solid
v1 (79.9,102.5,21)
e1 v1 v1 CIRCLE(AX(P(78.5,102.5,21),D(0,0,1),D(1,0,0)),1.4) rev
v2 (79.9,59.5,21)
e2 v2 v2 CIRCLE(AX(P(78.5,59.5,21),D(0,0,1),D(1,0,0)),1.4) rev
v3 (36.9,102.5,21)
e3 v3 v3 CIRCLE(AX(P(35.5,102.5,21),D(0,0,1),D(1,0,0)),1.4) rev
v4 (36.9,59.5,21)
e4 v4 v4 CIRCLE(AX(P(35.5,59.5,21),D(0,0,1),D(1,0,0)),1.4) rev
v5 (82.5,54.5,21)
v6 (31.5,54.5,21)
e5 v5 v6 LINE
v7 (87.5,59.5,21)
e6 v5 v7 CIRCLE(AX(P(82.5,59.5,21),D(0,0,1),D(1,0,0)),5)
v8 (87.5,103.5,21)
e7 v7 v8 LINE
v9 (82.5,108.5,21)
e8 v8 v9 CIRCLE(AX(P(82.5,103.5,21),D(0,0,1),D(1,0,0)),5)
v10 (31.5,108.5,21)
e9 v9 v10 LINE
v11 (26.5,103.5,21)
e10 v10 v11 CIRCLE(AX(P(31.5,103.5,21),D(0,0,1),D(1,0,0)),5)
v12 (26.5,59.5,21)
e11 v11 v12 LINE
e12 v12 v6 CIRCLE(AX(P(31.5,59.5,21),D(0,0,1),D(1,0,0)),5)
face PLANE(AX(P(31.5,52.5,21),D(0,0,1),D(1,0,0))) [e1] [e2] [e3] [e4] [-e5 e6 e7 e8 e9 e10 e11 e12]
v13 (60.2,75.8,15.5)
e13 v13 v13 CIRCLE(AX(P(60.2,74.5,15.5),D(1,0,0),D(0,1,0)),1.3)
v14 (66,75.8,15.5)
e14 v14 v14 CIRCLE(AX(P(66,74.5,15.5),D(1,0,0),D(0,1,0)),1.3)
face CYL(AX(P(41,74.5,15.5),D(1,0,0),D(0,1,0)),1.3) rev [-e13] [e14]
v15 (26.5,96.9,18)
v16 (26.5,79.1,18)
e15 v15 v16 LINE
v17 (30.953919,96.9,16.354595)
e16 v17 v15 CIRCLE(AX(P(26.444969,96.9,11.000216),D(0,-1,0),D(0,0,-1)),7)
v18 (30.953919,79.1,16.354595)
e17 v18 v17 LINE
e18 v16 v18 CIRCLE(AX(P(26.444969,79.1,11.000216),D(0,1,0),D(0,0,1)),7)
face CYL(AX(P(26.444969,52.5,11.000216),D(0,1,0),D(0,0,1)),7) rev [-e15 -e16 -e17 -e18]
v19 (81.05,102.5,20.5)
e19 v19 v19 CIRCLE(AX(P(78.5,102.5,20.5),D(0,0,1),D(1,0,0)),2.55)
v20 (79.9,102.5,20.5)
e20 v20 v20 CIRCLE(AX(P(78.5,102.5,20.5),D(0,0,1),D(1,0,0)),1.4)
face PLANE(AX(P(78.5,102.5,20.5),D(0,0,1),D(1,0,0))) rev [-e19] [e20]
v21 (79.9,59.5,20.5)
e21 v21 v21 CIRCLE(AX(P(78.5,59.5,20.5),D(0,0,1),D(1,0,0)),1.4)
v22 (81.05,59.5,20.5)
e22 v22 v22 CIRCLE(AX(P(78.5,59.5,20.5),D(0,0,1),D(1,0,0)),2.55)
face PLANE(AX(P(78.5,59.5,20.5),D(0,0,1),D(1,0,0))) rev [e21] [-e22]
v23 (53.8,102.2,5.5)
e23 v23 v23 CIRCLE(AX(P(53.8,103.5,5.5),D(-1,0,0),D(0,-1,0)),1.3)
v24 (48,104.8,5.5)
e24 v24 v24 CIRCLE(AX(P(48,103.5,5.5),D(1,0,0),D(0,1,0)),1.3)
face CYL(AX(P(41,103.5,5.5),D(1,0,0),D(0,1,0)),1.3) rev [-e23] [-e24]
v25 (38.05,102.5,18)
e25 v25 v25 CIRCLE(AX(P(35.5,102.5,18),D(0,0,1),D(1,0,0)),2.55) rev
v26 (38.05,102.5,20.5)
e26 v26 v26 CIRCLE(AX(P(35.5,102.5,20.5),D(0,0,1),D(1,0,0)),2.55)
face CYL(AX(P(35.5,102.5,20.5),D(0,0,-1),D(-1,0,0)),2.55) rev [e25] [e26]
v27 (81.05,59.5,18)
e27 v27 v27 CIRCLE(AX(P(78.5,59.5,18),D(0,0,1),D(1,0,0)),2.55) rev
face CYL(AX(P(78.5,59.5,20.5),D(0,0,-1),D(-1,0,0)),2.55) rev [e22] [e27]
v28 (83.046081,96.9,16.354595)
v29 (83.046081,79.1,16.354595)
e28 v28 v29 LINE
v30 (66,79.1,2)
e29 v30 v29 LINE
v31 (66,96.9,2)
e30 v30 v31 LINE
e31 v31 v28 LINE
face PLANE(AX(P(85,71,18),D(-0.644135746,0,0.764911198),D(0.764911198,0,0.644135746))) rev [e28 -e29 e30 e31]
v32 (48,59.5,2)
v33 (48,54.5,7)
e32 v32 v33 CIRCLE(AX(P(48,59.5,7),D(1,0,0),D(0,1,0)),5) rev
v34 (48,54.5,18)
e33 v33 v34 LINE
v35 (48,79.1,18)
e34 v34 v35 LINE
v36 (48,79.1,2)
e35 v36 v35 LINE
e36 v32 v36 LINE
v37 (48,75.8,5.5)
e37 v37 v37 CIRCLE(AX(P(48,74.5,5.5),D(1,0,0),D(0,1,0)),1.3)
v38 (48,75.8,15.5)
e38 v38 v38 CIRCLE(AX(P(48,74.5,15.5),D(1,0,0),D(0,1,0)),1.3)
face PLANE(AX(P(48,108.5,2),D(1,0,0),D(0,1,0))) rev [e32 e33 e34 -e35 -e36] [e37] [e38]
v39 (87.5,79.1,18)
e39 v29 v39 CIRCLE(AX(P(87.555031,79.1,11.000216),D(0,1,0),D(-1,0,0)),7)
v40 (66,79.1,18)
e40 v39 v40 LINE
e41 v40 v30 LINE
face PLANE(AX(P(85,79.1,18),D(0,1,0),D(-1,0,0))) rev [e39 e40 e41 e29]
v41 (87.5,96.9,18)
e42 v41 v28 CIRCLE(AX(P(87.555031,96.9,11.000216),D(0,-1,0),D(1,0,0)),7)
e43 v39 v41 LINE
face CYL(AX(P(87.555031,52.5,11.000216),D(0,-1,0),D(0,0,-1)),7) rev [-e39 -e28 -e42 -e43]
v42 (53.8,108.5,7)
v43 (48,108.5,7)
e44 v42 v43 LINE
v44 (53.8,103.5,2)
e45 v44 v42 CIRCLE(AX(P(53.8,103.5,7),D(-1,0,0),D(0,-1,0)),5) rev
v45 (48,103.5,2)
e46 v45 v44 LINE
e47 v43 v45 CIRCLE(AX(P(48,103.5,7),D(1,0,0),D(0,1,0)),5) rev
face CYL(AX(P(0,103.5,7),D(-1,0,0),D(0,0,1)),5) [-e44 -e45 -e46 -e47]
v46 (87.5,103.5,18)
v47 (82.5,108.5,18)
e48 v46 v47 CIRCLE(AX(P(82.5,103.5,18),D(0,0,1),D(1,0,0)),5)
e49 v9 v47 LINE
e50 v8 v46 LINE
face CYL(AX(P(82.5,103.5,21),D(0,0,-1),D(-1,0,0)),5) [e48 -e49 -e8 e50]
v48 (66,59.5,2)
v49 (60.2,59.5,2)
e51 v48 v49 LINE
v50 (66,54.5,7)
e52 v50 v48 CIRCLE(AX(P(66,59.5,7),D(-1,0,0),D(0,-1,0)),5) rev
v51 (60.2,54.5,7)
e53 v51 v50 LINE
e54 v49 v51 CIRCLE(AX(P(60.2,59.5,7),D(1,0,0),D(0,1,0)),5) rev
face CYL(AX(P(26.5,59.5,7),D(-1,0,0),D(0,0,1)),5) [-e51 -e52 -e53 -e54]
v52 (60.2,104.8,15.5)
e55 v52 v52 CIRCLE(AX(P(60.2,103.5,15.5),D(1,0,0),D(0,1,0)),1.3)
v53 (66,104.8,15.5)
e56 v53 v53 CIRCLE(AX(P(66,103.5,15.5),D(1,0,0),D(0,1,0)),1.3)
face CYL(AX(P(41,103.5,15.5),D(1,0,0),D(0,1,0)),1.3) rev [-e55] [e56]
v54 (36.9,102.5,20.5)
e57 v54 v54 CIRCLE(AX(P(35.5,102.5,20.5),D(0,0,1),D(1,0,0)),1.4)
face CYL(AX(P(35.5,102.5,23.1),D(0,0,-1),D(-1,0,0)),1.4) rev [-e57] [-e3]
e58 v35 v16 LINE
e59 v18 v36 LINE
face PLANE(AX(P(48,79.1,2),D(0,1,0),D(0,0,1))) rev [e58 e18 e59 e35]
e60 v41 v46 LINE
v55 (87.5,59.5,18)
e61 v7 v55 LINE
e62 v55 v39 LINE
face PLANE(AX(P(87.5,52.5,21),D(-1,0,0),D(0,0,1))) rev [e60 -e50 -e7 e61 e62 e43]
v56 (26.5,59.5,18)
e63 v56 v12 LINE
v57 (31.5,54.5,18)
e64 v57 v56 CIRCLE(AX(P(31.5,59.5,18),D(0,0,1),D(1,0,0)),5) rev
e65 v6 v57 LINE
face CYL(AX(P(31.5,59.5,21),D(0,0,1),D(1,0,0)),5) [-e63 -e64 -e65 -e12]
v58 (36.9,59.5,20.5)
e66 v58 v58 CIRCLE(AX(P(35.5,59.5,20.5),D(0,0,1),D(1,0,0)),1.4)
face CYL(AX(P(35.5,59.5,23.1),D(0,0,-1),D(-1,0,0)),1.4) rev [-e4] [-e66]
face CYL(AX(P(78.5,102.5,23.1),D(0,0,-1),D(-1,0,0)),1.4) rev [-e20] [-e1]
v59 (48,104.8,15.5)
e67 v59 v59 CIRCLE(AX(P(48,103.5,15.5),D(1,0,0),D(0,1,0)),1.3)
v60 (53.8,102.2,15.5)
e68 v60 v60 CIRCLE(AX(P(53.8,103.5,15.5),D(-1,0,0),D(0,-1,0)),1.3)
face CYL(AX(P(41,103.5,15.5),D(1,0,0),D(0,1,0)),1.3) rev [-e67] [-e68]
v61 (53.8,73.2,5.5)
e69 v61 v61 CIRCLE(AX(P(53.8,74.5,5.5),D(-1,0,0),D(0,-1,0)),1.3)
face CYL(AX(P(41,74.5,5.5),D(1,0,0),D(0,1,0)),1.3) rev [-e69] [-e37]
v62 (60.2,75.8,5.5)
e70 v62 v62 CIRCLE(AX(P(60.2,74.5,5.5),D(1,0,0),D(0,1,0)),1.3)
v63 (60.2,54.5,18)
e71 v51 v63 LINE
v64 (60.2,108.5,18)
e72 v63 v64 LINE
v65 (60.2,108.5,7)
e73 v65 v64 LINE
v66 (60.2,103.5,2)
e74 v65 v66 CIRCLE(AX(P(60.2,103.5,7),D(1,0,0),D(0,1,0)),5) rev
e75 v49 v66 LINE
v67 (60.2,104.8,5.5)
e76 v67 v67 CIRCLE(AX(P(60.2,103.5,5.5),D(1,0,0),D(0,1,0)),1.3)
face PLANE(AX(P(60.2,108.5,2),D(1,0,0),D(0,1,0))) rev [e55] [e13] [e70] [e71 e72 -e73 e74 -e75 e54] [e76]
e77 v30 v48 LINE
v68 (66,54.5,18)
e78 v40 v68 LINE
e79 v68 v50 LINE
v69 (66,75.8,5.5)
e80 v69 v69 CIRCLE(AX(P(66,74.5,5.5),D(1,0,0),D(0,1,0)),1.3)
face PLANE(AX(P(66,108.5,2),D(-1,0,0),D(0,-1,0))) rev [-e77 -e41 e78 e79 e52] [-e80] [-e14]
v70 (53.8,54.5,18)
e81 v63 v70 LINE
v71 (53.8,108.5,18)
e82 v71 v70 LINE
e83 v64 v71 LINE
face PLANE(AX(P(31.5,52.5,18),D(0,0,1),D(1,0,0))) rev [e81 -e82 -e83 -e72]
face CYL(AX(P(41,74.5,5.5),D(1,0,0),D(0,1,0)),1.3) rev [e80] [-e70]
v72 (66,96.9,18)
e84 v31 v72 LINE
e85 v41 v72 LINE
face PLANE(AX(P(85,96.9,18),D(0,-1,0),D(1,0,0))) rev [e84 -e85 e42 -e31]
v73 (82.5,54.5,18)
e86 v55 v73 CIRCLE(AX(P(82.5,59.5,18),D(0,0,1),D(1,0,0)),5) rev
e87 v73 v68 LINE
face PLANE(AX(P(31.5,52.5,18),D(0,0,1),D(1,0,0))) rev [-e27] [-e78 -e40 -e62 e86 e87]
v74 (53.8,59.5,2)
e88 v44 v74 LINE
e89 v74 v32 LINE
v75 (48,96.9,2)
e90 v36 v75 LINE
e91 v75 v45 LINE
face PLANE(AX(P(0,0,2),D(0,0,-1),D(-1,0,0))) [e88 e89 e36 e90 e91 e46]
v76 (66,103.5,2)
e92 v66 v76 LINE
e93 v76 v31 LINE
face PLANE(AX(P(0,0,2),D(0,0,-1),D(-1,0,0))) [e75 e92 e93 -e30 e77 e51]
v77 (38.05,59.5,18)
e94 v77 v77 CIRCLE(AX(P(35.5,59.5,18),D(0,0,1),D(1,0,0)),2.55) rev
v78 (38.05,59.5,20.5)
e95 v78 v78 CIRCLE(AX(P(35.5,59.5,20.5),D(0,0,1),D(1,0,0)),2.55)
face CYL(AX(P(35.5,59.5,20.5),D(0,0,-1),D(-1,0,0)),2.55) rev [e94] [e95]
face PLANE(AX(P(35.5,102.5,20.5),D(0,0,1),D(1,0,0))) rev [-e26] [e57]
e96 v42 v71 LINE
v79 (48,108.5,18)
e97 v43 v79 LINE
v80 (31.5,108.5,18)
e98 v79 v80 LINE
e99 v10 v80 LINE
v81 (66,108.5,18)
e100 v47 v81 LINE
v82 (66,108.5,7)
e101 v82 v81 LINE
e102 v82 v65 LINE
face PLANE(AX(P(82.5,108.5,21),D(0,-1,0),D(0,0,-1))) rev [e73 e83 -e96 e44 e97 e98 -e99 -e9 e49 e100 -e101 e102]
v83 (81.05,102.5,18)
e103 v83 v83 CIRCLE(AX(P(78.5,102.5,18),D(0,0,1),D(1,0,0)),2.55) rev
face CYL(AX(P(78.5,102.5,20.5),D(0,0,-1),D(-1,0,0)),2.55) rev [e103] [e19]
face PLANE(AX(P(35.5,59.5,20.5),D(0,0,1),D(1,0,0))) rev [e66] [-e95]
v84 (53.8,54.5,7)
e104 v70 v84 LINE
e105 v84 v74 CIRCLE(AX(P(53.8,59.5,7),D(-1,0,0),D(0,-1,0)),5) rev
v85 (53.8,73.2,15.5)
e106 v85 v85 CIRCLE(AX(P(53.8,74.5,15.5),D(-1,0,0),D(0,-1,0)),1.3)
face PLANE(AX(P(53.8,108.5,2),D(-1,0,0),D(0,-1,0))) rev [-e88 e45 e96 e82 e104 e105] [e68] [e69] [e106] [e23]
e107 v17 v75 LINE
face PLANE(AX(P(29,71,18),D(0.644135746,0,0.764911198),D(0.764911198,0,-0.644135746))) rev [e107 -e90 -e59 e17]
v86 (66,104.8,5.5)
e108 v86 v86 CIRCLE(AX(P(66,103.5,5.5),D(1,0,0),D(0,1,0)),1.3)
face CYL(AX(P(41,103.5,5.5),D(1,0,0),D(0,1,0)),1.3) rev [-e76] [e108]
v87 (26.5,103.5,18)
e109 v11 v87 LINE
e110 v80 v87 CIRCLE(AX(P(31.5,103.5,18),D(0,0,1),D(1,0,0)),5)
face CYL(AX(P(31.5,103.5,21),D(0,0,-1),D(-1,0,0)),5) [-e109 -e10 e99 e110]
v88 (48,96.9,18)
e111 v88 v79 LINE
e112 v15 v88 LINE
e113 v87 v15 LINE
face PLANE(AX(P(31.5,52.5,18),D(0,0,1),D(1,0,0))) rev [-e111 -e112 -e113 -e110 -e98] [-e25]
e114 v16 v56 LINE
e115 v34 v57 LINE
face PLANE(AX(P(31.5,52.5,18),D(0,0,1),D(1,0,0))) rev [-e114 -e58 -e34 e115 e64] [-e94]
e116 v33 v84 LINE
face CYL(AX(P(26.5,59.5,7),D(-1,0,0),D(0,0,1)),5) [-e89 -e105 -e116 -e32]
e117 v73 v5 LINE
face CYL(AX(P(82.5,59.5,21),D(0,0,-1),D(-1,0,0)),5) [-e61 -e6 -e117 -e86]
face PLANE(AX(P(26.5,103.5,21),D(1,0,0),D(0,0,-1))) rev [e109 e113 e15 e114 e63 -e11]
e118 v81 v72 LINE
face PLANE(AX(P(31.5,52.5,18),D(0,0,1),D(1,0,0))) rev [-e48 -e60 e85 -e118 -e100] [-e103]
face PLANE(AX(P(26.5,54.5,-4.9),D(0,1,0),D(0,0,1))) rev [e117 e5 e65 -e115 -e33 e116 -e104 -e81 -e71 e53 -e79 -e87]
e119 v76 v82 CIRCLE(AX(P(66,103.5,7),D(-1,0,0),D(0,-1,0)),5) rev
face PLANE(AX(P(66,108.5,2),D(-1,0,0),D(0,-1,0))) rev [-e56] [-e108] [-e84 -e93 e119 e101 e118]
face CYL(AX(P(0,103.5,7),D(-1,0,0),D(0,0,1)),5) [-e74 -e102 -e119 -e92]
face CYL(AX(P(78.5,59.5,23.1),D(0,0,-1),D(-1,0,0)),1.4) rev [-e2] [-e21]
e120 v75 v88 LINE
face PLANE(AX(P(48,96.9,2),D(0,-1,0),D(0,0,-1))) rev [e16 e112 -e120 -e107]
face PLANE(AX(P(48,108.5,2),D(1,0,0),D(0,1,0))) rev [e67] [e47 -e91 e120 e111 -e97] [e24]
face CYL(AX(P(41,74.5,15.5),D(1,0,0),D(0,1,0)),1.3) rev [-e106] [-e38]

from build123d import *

# Parameters (mm, degrees)
F_61_START                              = 18
F_61_X_61_RADAR_PLATFORM_DEPTH          = 3
C1_START                                = 17.9
C1_FOUR_CLEARANCES_43_X_43_MM_PROFILE_R = 1.4
C1_FOUR_CLEARANCES_43_X_43_MM_DEPTH     = 5.2
C1_SCREW_HEAD_POCKETS_PROFILE_R         = 2.55
C1_SCREW_HEAD_POCKETS_DEPTH             = 2.6
SKETCH_3_W                              = 5.8
SKETCH_3_H                              = 61
EXTRUDE_2_DEPTH                         = 16
SKETCH_4_R                              = 1.3
CUT_EXTRUDE_4_DEPTH                     = 25
SKETCH_5_W                              = 16
SKETCH_5_H                              = 17.8
EXTRUDE_3_DEPTH                         = 19
SKETCH_6_W                              = 19
SKETCH_6_H                              = 17.8
EXTRUDE_4_DEPTH                         = 16
CUT_EXTRUDE_5_DEPTH                     = 25.9
FILLET_4_R                              = 7
SKETCH_8_W                              = 61.060792307
SKETCH_8_H                              = 7.060792307
CUT_EXTRUDE_6_DEPTH                     = 25.9
FILLET_5_R                              = 5


with BuildPart() as part:
    # 61 x 61 radar platform profile → 61 x 61 radar platform (new body)
    with BuildSketch(Plane.XY.offset(F_61_START)):
        with BuildLine():
            Line((31.5, 47.5), (82.5, 47.5))
            ThreePointArc((82.5, 47.5), (86.035533906, 48.964466094), (87.5, 52.5))
            Line((87.5, 52.5), (87.5, 103.5))
            ThreePointArc((87.5, 103.5), (86.035533906, 107.035533906), (82.5, 108.5))
            Line((82.5, 108.5), (31.5, 108.5))
            ThreePointArc((31.5, 108.5), (27.964466094, 107.035533906), (26.5, 103.5))
            Line((26.5, 103.5), (26.5, 52.5))
            ThreePointArc((26.5, 52.5), (27.964466094, 48.964466094), (31.5, 47.5))
        make_face()
    extrude(amount=F_61_X_61_RADAR_PLATFORM_DEPTH)

    # C1 four clearances 43 x 43 mm profile → C1 four clearances 43 x 43 mm (cut)
    with BuildSketch(Plane.XY.offset(C1_START)):
        with Locations((35.5, 59.5)):
            Circle(C1_FOUR_CLEARANCES_43_X_43_MM_PROFILE_R)
        with Locations((35.5, 102.5)):
            Circle(C1_FOUR_CLEARANCES_43_X_43_MM_PROFILE_R)
        with Locations((78.5, 59.5)):
            Circle(C1_FOUR_CLEARANCES_43_X_43_MM_PROFILE_R)
        with Locations((78.5, 102.5)):
            Circle(C1_FOUR_CLEARANCES_43_X_43_MM_PROFILE_R)
    extrude(amount=C1_FOUR_CLEARANCES_43_X_43_MM_DEPTH, mode=Mode.SUBTRACT)

    # C1 screw head pockets profile → C1 screw head pockets (cut)
    with BuildSketch(Plane.XY.offset(C1_START)):
        with Locations((35.5, 59.5)):
            Circle(C1_SCREW_HEAD_POCKETS_PROFILE_R)
        with Locations((35.5, 102.5)):
            Circle(C1_SCREW_HEAD_POCKETS_PROFILE_R)
        with Locations((78.5, 59.5)):
            Circle(C1_SCREW_HEAD_POCKETS_PROFILE_R)
        with Locations((78.5, 102.5)):
            Circle(C1_SCREW_HEAD_POCKETS_PROFILE_R)
    extrude(amount=C1_SCREW_HEAD_POCKETS_DEPTH, mode=Mode.SUBTRACT)

    # 草图3 → 凸台-拉伸2 (add)
    with BuildSketch(Plane(origin=(0, 0, 18), x_dir=(-1, 0, 0), z_dir=(0, 0, -1))):
        with Locations((-63.1, 78)):
            Rectangle(SKETCH_3_W, SKETCH_3_H)
        with Locations((-50.9, 78)):
            Rectangle(SKETCH_3_W, SKETCH_3_H)
    extrude(amount=EXTRUDE_2_DEPTH)

    # 草图4 → 切除-拉伸4 (cut)
    with BuildSketch(Plane(origin=(66, 0, 0), x_dir=(0, 0, -1), z_dir=(1, 0, 0))):
        with Locations(Location((-15.5, 103.5, 0), (0, 0, 90))):
            Circle(SKETCH_4_R)
        with Locations(Location((-15.5, 74.5, 0), (0, 0, 90))):
            Circle(SKETCH_4_R)
        with Locations(Location((-5.5, 103.5, 0), (0, 0, 90))):
            Circle(SKETCH_4_R)
        with Locations(Location((-5.5, 74.5, 0), (0, 0, 90))):
            Circle(SKETCH_4_R)
    extrude(amount=-CUT_EXTRUDE_4_DEPTH, mode=Mode.SUBTRACT)

    # 草图5 → 凸台-拉伸3 (add)
    with BuildSketch(Plane(origin=(66, 0, 0), x_dir=(0, 0, -1), z_dir=(1, 0, 0))):
        with Locations((-10, 88)):
            Rectangle(SKETCH_5_W, SKETCH_5_H)
    extrude(amount=EXTRUDE_3_DEPTH)

    # 草图6 → 凸台-拉伸4 (add)
    with BuildSketch(Plane(origin=(0, 0, 18), x_dir=(-1, 0, 0), z_dir=(0, 0, -1))):
        with Locations((-38.5, 88)):
            Rectangle(SKETCH_6_W, SKETCH_6_H)
    extrude(amount=EXTRUDE_4_DEPTH)

    # 草图7 → 切除-拉伸5 (cut)
    with BuildSketch(Plane(origin=(0, 96.9, 0), x_dir=(1, 0, 0), z_dir=(0, 1, 0))):
        Polygon((66, -2), (85, -2), (85, -18), align=None)
        Polygon((48, -2), (29, -2), (29, -18), align=None)
    extrude(amount=-CUT_EXTRUDE_5_DEPTH, mode=Mode.SUBTRACT)

    # 圆角4
    # the kernel refuses this fillet: 7 mm, written as the material it adds along each edge
    with BuildSketch(Plane(origin=(85, 79.1, 18), x_dir=(-0.7649111981170483, 0, -0.6441357457827827), z_dir=(0, 1, 0))) as fillet_4_piece_1_section:
        with BuildLine():
            CenterArc((FILLET_4_R * 0.364967793547, -FILLET_4_R), FILLET_4_R, 90, 40.100907546)
            Line((-FILLET_4_R * 0.279167952236, -FILLET_4_R * 0.235088801883), (0, 0))
            Line((0, 0), (FILLET_4_R * 0.364967793547, 0))
        make_face()
    fillet_4_piece_1 = extrude(amount=17.8, mode=Mode.PRIVATE)
    fillet_4_piece_1 = split(fillet_4_piece_1, bisect_by=Plane(origin=(87.5, 88, 17.657135978), z_dir=(-1, 0, 0)), keep=Keep.TOP, mode=Mode.PRIVATE)
    add(fillet_4_piece_1)
    with BuildSketch(Plane(origin=(29, 96.9, 18), x_dir=(-1, 0, 0), z_dir=(0, -1, 0))) as fillet_4_piece_2_section:
        with BuildLine():
            CenterArc((FILLET_4_R * 0.364967793547, FILLET_4_R), FILLET_4_R, 229.899092454, 40.100907546)
            Line((-FILLET_4_R * 0.279167952236, FILLET_4_R * 0.235088801883), (0, 0))
            Line((0, 0), (FILLET_4_R * 0.364967793547, 0))
        make_face()
    fillet_4_piece_2 = extrude(amount=17.8, mode=Mode.PRIVATE)
    fillet_4_piece_2 = split(fillet_4_piece_2, bisect_by=Plane(origin=(26.5, 88, 17.657135978), z_dir=(1, 0, 0)), keep=Keep.TOP, mode=Mode.PRIVATE)
    add(fillet_4_piece_2)

    # 草图8 → 切除-拉伸6 (cut)
    with BuildSketch(Plane.XY.offset(21)):
        with Locations((57.030396153, 50.969603847)):
            Rectangle(SKETCH_8_W, SKETCH_8_H)
    extrude(amount=-CUT_EXTRUDE_6_DEPTH, mode=Mode.SUBTRACT)

    # 圆角5
    fillet_5_edges = [part.edges().sort_by_distance(p)[0] for p in [
        (63.1, 54.5, 2),
        (26.5, 54.5, 19.5),
        (87.5, 54.5, 19.5),
        (50.9, 54.5, 2),
        (63.1, 108.5, 2),
        (50.9, 108.5, 2),
    ]]
    fillet(fillet_5_edges, radius=FILLET_5_R)


solid = part.part
